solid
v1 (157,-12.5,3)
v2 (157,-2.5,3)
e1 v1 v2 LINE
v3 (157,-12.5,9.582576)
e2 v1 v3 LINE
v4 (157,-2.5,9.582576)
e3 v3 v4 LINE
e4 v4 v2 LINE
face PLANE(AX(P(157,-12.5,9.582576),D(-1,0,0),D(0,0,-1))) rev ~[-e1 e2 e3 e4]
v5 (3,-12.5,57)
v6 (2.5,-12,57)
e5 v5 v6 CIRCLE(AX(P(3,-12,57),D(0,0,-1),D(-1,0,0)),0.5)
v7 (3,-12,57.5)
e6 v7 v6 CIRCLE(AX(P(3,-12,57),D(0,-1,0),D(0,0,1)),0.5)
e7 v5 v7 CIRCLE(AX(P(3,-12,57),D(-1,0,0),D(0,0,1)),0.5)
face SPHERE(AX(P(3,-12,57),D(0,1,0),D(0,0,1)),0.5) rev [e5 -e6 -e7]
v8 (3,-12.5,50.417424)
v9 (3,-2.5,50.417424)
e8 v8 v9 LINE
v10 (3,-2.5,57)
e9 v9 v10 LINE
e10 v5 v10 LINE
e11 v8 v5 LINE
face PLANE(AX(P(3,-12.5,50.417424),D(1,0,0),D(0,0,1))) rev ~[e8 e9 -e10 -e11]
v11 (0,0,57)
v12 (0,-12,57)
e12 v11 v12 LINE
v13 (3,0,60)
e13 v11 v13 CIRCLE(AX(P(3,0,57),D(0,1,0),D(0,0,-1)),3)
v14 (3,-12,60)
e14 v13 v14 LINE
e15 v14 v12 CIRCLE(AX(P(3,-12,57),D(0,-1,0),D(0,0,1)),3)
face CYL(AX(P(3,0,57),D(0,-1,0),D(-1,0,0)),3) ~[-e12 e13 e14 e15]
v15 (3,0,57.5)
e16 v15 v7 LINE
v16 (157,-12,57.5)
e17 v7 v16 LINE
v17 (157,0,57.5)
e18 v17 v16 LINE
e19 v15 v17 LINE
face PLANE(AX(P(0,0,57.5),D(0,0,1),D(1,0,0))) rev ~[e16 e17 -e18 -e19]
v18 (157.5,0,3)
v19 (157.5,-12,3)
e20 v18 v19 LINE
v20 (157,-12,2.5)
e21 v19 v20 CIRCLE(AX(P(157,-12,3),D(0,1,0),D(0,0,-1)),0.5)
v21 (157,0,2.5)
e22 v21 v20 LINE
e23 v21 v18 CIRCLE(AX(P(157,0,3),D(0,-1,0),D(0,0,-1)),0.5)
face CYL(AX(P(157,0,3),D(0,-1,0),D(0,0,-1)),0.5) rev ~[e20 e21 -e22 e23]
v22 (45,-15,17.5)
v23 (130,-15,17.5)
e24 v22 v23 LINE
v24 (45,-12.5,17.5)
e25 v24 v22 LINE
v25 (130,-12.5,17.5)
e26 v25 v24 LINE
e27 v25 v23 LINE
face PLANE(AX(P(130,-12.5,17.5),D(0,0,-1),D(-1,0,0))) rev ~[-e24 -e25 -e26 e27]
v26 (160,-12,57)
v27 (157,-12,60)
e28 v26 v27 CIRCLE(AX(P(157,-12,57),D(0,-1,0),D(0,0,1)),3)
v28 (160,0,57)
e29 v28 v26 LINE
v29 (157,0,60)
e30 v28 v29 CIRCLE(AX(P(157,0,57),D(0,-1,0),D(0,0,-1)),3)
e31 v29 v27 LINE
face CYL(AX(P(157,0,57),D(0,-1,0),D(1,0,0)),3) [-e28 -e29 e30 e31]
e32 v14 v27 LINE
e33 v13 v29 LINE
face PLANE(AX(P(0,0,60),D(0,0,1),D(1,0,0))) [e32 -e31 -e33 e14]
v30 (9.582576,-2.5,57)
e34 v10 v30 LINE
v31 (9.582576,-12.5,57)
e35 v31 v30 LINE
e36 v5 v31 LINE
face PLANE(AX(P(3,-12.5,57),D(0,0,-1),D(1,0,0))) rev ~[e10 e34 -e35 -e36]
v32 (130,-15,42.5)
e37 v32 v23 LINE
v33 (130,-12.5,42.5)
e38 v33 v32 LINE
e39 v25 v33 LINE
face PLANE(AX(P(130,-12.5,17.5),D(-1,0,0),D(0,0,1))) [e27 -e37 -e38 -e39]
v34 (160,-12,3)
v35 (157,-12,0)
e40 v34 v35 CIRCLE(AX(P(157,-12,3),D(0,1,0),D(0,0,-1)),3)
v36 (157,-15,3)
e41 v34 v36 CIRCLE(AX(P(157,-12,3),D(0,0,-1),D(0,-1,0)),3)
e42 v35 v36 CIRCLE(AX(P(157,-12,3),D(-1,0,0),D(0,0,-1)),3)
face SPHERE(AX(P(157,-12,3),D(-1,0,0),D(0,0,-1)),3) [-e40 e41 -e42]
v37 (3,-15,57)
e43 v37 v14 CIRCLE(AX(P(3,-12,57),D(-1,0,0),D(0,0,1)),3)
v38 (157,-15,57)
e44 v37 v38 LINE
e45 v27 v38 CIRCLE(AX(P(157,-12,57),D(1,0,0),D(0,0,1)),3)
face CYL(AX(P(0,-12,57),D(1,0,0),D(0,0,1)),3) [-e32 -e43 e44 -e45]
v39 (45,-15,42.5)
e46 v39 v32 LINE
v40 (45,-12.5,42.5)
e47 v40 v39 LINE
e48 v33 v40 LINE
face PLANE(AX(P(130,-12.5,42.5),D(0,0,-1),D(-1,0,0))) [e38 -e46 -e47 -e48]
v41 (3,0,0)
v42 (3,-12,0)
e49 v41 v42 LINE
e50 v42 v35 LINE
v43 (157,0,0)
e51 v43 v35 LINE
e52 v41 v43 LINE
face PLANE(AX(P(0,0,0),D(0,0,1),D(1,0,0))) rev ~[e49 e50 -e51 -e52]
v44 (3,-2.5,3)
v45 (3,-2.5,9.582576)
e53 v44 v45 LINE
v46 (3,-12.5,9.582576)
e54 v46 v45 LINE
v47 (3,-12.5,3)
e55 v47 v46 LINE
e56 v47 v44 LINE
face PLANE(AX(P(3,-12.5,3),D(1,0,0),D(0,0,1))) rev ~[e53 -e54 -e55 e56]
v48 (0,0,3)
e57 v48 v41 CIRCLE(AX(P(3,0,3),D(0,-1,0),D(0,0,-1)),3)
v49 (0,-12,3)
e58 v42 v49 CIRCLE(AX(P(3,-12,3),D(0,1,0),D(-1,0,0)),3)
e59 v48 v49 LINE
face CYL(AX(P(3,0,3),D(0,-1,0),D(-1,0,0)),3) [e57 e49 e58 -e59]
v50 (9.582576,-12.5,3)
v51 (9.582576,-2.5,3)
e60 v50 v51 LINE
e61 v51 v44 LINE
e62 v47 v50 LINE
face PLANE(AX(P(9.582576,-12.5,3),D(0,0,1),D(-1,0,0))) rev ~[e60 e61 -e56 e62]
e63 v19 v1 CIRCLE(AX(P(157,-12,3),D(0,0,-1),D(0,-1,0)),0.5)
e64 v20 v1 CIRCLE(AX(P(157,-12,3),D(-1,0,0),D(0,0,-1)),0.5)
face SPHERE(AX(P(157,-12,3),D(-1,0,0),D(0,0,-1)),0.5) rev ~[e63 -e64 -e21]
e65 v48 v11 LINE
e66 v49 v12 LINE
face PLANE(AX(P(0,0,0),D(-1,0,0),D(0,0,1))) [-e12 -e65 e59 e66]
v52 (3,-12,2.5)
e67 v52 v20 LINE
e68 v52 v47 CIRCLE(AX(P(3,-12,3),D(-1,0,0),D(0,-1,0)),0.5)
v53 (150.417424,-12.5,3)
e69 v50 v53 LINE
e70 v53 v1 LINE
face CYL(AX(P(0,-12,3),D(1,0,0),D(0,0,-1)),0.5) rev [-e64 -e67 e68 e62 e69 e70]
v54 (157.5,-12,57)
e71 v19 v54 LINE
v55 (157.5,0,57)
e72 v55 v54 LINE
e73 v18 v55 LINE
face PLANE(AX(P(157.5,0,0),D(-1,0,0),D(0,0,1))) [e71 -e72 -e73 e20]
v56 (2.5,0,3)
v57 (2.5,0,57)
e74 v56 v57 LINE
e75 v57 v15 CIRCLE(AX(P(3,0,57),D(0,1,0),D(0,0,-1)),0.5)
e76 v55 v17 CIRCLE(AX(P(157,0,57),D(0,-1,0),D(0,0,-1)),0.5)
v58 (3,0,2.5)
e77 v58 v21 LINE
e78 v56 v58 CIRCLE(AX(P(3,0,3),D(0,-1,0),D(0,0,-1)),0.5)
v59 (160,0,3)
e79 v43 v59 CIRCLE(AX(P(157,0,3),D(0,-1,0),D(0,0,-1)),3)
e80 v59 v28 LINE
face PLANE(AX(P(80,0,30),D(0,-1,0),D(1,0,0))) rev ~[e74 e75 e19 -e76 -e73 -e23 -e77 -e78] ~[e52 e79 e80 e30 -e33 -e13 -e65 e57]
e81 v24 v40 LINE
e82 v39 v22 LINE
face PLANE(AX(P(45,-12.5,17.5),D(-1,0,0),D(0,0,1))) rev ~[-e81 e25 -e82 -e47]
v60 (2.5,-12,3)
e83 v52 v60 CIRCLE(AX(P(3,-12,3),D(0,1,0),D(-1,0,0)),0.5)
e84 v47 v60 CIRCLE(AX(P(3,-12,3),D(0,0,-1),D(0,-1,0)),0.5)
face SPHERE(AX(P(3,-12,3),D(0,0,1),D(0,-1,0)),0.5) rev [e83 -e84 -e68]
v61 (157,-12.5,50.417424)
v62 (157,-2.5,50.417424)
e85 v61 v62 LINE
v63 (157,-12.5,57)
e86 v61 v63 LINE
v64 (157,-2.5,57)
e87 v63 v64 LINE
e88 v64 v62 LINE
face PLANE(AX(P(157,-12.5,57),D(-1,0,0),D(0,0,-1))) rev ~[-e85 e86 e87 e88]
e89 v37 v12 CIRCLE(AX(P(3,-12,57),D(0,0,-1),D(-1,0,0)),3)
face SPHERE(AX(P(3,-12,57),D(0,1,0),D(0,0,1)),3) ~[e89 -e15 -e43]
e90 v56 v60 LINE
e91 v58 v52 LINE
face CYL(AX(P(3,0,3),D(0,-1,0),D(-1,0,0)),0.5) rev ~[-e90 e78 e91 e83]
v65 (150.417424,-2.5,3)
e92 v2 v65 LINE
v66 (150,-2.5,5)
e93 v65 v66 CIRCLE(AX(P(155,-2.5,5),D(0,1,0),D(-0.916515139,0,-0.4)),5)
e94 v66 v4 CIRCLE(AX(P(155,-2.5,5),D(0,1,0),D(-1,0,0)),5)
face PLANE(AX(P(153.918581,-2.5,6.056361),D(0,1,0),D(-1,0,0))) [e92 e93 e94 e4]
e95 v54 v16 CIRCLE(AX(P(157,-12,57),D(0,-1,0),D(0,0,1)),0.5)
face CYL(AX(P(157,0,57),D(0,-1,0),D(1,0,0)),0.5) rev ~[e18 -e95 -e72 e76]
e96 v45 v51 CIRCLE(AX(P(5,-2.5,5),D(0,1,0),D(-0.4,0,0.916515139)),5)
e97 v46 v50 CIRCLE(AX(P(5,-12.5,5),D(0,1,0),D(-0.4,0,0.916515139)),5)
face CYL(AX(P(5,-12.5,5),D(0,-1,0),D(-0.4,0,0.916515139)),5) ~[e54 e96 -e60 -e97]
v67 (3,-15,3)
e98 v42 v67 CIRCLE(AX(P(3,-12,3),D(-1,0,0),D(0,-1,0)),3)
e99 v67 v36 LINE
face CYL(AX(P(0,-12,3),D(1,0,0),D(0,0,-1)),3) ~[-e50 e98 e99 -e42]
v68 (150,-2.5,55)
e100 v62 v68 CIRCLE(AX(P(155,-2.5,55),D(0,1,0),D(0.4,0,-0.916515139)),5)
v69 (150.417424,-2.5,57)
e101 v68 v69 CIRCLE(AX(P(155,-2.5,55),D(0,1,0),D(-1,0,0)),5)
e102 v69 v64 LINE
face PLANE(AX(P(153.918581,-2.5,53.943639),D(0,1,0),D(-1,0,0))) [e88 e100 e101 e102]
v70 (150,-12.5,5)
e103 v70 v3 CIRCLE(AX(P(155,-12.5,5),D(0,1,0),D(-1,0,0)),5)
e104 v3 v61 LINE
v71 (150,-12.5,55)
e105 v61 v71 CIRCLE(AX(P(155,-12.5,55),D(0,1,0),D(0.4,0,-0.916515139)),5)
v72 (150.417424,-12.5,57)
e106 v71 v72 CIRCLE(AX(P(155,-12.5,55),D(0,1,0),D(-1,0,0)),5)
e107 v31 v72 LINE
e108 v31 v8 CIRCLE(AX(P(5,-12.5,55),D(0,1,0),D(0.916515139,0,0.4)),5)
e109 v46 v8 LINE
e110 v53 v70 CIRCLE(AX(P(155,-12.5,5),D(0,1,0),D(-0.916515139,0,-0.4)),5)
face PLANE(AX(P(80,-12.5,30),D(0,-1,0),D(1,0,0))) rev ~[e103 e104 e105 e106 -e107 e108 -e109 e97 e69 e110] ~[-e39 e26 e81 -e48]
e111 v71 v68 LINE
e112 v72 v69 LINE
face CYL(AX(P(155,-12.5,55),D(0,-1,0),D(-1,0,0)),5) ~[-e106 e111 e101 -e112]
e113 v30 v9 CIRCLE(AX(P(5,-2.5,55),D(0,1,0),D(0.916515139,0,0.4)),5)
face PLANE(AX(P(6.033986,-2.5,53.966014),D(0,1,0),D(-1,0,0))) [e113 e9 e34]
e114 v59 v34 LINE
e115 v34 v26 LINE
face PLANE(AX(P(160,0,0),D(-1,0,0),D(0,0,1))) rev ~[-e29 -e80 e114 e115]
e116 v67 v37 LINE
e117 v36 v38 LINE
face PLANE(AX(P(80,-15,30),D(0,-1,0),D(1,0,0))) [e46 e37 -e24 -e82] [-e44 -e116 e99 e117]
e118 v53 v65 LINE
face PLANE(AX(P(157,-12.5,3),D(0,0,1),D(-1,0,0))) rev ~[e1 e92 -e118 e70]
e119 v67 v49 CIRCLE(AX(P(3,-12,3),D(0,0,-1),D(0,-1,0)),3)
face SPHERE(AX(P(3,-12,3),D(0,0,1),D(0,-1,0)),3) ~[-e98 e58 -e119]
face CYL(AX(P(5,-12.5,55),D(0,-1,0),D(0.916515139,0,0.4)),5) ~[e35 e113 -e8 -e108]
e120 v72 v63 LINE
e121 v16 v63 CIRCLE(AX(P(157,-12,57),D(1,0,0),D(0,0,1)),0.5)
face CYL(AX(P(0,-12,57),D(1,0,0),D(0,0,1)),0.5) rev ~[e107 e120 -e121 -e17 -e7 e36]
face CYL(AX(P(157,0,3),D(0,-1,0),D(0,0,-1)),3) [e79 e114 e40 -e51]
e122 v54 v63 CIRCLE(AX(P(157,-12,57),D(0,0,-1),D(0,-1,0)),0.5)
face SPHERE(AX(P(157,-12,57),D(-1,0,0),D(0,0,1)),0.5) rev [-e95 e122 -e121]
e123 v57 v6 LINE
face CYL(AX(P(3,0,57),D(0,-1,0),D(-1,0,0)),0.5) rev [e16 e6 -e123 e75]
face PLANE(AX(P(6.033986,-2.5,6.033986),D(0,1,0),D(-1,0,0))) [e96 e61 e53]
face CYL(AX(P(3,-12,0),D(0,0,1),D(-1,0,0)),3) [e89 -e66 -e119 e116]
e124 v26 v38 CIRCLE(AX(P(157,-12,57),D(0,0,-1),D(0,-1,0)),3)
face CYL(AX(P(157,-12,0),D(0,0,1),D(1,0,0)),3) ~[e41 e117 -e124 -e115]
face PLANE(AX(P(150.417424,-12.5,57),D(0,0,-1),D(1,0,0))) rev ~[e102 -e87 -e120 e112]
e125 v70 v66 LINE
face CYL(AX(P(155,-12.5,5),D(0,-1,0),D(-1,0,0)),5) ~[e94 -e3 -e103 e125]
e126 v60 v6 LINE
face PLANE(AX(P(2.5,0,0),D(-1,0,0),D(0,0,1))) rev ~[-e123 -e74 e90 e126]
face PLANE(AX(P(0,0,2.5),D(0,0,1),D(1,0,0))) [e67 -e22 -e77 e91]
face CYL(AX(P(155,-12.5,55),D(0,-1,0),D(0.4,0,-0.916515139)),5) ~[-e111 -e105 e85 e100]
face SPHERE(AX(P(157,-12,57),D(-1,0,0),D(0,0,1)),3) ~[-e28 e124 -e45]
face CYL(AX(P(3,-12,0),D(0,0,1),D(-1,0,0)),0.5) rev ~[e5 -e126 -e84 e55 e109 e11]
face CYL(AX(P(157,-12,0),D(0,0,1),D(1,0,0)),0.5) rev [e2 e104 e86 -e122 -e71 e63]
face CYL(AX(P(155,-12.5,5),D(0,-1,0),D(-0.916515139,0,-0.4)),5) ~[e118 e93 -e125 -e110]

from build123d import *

# Parameters (mm, degrees)
F0_W     = 160
F0_H     = 60
F1_DEPTH = 15
F2_R     = 3
F3_T     = -2.5
F5_DEPTH = 10
F6_W     = 85
F6_H     = 25
F7_DEPTH = 25


with BuildPart() as f1:
    # F0 (on Front) → F1 (new body)
    with BuildSketch(Plane.XZ):
        with Locations((80, 30)):
            Rectangle(F0_W, F0_H)
    extrude(amount=F1_DEPTH)

    # F2
    f2_edges = [f1.edges().sort_by_distance(p)[0] for p in [
        (0, -7.5, 60),
        (80, -15, 60),
        (0, -15, 30),
        (80, -15, 0),
        (0, -7.5, 0),
        (160, -7.5, 0),
        (160, -7.5, 60),
        (160, -15, 30),
    ]]
    fillet(f2_edges, radius=F2_R)

    # F3
    f3_openings = [f1.faces().sort_by_distance(p)[0] for p in [
        (80, 0, 30),
    ]]
    offset(amount=F3_T, openings=f3_openings)

    # F4 (on face) → F5 (join)
    with BuildSketch(Plane(origin=(0, -12.5, 0), x_dir=(-1, 0, 0), z_dir=(0, 1, 0))):
        with BuildLine():
            ThreePointArc((-157, 50.417424305), (-152.2613872125, 50.8166998673), (-150, 55))
            ThreePointArc((-150, 55), (-150.1054684353, 56.0215482184), (-150.417424305, 57))
            Line((-150.417424305, 57), (-157, 57))
            Line((-157, 57), (-157, 50.417424305))
        make_face()
        with BuildLine():
            Line((-3, 57), (-9.582575695, 57))
            ThreePointArc((-9.582575695, 57), (-8.5355339059, 51.4644660941), (-3, 50.417424305))
            Line((-3, 50.417424305), (-3, 57))
        make_face()
        with BuildLine():
            ThreePointArc((-150, 5), (-152.2613872125, 9.1833001327), (-157, 9.582575695))
            Line((-157, 9.582575695), (-157, 3))
            Line((-157, 3), (-150.417424305, 3))
            ThreePointArc((-150.417424305, 3), (-150.1054684353, 3.9784517816), (-150, 5))
        make_face()
        with BuildLine():
            Line((-3, 3), (-3, 9.582575695))
            ThreePointArc((-3, 9.582575695), (-8.5355339059, 8.5355339059), (-9.582575695, 3))
            Line((-9.582575695, 3), (-3, 3))
        make_face()
    extrude(amount=F5_DEPTH)

    # F6 (on face) → F7 (cut)
    with BuildSketch(Plane(origin=(0, -12.5, 0), x_dir=(-1, 0, 0), z_dir=(0, 1, 0))):
        with Locations((-87.5, 30)):
            Rectangle(F6_W, F6_H)
    extrude(amount=-F7_DEPTH, mode=Mode.SUBTRACT)


solid = f1.part
